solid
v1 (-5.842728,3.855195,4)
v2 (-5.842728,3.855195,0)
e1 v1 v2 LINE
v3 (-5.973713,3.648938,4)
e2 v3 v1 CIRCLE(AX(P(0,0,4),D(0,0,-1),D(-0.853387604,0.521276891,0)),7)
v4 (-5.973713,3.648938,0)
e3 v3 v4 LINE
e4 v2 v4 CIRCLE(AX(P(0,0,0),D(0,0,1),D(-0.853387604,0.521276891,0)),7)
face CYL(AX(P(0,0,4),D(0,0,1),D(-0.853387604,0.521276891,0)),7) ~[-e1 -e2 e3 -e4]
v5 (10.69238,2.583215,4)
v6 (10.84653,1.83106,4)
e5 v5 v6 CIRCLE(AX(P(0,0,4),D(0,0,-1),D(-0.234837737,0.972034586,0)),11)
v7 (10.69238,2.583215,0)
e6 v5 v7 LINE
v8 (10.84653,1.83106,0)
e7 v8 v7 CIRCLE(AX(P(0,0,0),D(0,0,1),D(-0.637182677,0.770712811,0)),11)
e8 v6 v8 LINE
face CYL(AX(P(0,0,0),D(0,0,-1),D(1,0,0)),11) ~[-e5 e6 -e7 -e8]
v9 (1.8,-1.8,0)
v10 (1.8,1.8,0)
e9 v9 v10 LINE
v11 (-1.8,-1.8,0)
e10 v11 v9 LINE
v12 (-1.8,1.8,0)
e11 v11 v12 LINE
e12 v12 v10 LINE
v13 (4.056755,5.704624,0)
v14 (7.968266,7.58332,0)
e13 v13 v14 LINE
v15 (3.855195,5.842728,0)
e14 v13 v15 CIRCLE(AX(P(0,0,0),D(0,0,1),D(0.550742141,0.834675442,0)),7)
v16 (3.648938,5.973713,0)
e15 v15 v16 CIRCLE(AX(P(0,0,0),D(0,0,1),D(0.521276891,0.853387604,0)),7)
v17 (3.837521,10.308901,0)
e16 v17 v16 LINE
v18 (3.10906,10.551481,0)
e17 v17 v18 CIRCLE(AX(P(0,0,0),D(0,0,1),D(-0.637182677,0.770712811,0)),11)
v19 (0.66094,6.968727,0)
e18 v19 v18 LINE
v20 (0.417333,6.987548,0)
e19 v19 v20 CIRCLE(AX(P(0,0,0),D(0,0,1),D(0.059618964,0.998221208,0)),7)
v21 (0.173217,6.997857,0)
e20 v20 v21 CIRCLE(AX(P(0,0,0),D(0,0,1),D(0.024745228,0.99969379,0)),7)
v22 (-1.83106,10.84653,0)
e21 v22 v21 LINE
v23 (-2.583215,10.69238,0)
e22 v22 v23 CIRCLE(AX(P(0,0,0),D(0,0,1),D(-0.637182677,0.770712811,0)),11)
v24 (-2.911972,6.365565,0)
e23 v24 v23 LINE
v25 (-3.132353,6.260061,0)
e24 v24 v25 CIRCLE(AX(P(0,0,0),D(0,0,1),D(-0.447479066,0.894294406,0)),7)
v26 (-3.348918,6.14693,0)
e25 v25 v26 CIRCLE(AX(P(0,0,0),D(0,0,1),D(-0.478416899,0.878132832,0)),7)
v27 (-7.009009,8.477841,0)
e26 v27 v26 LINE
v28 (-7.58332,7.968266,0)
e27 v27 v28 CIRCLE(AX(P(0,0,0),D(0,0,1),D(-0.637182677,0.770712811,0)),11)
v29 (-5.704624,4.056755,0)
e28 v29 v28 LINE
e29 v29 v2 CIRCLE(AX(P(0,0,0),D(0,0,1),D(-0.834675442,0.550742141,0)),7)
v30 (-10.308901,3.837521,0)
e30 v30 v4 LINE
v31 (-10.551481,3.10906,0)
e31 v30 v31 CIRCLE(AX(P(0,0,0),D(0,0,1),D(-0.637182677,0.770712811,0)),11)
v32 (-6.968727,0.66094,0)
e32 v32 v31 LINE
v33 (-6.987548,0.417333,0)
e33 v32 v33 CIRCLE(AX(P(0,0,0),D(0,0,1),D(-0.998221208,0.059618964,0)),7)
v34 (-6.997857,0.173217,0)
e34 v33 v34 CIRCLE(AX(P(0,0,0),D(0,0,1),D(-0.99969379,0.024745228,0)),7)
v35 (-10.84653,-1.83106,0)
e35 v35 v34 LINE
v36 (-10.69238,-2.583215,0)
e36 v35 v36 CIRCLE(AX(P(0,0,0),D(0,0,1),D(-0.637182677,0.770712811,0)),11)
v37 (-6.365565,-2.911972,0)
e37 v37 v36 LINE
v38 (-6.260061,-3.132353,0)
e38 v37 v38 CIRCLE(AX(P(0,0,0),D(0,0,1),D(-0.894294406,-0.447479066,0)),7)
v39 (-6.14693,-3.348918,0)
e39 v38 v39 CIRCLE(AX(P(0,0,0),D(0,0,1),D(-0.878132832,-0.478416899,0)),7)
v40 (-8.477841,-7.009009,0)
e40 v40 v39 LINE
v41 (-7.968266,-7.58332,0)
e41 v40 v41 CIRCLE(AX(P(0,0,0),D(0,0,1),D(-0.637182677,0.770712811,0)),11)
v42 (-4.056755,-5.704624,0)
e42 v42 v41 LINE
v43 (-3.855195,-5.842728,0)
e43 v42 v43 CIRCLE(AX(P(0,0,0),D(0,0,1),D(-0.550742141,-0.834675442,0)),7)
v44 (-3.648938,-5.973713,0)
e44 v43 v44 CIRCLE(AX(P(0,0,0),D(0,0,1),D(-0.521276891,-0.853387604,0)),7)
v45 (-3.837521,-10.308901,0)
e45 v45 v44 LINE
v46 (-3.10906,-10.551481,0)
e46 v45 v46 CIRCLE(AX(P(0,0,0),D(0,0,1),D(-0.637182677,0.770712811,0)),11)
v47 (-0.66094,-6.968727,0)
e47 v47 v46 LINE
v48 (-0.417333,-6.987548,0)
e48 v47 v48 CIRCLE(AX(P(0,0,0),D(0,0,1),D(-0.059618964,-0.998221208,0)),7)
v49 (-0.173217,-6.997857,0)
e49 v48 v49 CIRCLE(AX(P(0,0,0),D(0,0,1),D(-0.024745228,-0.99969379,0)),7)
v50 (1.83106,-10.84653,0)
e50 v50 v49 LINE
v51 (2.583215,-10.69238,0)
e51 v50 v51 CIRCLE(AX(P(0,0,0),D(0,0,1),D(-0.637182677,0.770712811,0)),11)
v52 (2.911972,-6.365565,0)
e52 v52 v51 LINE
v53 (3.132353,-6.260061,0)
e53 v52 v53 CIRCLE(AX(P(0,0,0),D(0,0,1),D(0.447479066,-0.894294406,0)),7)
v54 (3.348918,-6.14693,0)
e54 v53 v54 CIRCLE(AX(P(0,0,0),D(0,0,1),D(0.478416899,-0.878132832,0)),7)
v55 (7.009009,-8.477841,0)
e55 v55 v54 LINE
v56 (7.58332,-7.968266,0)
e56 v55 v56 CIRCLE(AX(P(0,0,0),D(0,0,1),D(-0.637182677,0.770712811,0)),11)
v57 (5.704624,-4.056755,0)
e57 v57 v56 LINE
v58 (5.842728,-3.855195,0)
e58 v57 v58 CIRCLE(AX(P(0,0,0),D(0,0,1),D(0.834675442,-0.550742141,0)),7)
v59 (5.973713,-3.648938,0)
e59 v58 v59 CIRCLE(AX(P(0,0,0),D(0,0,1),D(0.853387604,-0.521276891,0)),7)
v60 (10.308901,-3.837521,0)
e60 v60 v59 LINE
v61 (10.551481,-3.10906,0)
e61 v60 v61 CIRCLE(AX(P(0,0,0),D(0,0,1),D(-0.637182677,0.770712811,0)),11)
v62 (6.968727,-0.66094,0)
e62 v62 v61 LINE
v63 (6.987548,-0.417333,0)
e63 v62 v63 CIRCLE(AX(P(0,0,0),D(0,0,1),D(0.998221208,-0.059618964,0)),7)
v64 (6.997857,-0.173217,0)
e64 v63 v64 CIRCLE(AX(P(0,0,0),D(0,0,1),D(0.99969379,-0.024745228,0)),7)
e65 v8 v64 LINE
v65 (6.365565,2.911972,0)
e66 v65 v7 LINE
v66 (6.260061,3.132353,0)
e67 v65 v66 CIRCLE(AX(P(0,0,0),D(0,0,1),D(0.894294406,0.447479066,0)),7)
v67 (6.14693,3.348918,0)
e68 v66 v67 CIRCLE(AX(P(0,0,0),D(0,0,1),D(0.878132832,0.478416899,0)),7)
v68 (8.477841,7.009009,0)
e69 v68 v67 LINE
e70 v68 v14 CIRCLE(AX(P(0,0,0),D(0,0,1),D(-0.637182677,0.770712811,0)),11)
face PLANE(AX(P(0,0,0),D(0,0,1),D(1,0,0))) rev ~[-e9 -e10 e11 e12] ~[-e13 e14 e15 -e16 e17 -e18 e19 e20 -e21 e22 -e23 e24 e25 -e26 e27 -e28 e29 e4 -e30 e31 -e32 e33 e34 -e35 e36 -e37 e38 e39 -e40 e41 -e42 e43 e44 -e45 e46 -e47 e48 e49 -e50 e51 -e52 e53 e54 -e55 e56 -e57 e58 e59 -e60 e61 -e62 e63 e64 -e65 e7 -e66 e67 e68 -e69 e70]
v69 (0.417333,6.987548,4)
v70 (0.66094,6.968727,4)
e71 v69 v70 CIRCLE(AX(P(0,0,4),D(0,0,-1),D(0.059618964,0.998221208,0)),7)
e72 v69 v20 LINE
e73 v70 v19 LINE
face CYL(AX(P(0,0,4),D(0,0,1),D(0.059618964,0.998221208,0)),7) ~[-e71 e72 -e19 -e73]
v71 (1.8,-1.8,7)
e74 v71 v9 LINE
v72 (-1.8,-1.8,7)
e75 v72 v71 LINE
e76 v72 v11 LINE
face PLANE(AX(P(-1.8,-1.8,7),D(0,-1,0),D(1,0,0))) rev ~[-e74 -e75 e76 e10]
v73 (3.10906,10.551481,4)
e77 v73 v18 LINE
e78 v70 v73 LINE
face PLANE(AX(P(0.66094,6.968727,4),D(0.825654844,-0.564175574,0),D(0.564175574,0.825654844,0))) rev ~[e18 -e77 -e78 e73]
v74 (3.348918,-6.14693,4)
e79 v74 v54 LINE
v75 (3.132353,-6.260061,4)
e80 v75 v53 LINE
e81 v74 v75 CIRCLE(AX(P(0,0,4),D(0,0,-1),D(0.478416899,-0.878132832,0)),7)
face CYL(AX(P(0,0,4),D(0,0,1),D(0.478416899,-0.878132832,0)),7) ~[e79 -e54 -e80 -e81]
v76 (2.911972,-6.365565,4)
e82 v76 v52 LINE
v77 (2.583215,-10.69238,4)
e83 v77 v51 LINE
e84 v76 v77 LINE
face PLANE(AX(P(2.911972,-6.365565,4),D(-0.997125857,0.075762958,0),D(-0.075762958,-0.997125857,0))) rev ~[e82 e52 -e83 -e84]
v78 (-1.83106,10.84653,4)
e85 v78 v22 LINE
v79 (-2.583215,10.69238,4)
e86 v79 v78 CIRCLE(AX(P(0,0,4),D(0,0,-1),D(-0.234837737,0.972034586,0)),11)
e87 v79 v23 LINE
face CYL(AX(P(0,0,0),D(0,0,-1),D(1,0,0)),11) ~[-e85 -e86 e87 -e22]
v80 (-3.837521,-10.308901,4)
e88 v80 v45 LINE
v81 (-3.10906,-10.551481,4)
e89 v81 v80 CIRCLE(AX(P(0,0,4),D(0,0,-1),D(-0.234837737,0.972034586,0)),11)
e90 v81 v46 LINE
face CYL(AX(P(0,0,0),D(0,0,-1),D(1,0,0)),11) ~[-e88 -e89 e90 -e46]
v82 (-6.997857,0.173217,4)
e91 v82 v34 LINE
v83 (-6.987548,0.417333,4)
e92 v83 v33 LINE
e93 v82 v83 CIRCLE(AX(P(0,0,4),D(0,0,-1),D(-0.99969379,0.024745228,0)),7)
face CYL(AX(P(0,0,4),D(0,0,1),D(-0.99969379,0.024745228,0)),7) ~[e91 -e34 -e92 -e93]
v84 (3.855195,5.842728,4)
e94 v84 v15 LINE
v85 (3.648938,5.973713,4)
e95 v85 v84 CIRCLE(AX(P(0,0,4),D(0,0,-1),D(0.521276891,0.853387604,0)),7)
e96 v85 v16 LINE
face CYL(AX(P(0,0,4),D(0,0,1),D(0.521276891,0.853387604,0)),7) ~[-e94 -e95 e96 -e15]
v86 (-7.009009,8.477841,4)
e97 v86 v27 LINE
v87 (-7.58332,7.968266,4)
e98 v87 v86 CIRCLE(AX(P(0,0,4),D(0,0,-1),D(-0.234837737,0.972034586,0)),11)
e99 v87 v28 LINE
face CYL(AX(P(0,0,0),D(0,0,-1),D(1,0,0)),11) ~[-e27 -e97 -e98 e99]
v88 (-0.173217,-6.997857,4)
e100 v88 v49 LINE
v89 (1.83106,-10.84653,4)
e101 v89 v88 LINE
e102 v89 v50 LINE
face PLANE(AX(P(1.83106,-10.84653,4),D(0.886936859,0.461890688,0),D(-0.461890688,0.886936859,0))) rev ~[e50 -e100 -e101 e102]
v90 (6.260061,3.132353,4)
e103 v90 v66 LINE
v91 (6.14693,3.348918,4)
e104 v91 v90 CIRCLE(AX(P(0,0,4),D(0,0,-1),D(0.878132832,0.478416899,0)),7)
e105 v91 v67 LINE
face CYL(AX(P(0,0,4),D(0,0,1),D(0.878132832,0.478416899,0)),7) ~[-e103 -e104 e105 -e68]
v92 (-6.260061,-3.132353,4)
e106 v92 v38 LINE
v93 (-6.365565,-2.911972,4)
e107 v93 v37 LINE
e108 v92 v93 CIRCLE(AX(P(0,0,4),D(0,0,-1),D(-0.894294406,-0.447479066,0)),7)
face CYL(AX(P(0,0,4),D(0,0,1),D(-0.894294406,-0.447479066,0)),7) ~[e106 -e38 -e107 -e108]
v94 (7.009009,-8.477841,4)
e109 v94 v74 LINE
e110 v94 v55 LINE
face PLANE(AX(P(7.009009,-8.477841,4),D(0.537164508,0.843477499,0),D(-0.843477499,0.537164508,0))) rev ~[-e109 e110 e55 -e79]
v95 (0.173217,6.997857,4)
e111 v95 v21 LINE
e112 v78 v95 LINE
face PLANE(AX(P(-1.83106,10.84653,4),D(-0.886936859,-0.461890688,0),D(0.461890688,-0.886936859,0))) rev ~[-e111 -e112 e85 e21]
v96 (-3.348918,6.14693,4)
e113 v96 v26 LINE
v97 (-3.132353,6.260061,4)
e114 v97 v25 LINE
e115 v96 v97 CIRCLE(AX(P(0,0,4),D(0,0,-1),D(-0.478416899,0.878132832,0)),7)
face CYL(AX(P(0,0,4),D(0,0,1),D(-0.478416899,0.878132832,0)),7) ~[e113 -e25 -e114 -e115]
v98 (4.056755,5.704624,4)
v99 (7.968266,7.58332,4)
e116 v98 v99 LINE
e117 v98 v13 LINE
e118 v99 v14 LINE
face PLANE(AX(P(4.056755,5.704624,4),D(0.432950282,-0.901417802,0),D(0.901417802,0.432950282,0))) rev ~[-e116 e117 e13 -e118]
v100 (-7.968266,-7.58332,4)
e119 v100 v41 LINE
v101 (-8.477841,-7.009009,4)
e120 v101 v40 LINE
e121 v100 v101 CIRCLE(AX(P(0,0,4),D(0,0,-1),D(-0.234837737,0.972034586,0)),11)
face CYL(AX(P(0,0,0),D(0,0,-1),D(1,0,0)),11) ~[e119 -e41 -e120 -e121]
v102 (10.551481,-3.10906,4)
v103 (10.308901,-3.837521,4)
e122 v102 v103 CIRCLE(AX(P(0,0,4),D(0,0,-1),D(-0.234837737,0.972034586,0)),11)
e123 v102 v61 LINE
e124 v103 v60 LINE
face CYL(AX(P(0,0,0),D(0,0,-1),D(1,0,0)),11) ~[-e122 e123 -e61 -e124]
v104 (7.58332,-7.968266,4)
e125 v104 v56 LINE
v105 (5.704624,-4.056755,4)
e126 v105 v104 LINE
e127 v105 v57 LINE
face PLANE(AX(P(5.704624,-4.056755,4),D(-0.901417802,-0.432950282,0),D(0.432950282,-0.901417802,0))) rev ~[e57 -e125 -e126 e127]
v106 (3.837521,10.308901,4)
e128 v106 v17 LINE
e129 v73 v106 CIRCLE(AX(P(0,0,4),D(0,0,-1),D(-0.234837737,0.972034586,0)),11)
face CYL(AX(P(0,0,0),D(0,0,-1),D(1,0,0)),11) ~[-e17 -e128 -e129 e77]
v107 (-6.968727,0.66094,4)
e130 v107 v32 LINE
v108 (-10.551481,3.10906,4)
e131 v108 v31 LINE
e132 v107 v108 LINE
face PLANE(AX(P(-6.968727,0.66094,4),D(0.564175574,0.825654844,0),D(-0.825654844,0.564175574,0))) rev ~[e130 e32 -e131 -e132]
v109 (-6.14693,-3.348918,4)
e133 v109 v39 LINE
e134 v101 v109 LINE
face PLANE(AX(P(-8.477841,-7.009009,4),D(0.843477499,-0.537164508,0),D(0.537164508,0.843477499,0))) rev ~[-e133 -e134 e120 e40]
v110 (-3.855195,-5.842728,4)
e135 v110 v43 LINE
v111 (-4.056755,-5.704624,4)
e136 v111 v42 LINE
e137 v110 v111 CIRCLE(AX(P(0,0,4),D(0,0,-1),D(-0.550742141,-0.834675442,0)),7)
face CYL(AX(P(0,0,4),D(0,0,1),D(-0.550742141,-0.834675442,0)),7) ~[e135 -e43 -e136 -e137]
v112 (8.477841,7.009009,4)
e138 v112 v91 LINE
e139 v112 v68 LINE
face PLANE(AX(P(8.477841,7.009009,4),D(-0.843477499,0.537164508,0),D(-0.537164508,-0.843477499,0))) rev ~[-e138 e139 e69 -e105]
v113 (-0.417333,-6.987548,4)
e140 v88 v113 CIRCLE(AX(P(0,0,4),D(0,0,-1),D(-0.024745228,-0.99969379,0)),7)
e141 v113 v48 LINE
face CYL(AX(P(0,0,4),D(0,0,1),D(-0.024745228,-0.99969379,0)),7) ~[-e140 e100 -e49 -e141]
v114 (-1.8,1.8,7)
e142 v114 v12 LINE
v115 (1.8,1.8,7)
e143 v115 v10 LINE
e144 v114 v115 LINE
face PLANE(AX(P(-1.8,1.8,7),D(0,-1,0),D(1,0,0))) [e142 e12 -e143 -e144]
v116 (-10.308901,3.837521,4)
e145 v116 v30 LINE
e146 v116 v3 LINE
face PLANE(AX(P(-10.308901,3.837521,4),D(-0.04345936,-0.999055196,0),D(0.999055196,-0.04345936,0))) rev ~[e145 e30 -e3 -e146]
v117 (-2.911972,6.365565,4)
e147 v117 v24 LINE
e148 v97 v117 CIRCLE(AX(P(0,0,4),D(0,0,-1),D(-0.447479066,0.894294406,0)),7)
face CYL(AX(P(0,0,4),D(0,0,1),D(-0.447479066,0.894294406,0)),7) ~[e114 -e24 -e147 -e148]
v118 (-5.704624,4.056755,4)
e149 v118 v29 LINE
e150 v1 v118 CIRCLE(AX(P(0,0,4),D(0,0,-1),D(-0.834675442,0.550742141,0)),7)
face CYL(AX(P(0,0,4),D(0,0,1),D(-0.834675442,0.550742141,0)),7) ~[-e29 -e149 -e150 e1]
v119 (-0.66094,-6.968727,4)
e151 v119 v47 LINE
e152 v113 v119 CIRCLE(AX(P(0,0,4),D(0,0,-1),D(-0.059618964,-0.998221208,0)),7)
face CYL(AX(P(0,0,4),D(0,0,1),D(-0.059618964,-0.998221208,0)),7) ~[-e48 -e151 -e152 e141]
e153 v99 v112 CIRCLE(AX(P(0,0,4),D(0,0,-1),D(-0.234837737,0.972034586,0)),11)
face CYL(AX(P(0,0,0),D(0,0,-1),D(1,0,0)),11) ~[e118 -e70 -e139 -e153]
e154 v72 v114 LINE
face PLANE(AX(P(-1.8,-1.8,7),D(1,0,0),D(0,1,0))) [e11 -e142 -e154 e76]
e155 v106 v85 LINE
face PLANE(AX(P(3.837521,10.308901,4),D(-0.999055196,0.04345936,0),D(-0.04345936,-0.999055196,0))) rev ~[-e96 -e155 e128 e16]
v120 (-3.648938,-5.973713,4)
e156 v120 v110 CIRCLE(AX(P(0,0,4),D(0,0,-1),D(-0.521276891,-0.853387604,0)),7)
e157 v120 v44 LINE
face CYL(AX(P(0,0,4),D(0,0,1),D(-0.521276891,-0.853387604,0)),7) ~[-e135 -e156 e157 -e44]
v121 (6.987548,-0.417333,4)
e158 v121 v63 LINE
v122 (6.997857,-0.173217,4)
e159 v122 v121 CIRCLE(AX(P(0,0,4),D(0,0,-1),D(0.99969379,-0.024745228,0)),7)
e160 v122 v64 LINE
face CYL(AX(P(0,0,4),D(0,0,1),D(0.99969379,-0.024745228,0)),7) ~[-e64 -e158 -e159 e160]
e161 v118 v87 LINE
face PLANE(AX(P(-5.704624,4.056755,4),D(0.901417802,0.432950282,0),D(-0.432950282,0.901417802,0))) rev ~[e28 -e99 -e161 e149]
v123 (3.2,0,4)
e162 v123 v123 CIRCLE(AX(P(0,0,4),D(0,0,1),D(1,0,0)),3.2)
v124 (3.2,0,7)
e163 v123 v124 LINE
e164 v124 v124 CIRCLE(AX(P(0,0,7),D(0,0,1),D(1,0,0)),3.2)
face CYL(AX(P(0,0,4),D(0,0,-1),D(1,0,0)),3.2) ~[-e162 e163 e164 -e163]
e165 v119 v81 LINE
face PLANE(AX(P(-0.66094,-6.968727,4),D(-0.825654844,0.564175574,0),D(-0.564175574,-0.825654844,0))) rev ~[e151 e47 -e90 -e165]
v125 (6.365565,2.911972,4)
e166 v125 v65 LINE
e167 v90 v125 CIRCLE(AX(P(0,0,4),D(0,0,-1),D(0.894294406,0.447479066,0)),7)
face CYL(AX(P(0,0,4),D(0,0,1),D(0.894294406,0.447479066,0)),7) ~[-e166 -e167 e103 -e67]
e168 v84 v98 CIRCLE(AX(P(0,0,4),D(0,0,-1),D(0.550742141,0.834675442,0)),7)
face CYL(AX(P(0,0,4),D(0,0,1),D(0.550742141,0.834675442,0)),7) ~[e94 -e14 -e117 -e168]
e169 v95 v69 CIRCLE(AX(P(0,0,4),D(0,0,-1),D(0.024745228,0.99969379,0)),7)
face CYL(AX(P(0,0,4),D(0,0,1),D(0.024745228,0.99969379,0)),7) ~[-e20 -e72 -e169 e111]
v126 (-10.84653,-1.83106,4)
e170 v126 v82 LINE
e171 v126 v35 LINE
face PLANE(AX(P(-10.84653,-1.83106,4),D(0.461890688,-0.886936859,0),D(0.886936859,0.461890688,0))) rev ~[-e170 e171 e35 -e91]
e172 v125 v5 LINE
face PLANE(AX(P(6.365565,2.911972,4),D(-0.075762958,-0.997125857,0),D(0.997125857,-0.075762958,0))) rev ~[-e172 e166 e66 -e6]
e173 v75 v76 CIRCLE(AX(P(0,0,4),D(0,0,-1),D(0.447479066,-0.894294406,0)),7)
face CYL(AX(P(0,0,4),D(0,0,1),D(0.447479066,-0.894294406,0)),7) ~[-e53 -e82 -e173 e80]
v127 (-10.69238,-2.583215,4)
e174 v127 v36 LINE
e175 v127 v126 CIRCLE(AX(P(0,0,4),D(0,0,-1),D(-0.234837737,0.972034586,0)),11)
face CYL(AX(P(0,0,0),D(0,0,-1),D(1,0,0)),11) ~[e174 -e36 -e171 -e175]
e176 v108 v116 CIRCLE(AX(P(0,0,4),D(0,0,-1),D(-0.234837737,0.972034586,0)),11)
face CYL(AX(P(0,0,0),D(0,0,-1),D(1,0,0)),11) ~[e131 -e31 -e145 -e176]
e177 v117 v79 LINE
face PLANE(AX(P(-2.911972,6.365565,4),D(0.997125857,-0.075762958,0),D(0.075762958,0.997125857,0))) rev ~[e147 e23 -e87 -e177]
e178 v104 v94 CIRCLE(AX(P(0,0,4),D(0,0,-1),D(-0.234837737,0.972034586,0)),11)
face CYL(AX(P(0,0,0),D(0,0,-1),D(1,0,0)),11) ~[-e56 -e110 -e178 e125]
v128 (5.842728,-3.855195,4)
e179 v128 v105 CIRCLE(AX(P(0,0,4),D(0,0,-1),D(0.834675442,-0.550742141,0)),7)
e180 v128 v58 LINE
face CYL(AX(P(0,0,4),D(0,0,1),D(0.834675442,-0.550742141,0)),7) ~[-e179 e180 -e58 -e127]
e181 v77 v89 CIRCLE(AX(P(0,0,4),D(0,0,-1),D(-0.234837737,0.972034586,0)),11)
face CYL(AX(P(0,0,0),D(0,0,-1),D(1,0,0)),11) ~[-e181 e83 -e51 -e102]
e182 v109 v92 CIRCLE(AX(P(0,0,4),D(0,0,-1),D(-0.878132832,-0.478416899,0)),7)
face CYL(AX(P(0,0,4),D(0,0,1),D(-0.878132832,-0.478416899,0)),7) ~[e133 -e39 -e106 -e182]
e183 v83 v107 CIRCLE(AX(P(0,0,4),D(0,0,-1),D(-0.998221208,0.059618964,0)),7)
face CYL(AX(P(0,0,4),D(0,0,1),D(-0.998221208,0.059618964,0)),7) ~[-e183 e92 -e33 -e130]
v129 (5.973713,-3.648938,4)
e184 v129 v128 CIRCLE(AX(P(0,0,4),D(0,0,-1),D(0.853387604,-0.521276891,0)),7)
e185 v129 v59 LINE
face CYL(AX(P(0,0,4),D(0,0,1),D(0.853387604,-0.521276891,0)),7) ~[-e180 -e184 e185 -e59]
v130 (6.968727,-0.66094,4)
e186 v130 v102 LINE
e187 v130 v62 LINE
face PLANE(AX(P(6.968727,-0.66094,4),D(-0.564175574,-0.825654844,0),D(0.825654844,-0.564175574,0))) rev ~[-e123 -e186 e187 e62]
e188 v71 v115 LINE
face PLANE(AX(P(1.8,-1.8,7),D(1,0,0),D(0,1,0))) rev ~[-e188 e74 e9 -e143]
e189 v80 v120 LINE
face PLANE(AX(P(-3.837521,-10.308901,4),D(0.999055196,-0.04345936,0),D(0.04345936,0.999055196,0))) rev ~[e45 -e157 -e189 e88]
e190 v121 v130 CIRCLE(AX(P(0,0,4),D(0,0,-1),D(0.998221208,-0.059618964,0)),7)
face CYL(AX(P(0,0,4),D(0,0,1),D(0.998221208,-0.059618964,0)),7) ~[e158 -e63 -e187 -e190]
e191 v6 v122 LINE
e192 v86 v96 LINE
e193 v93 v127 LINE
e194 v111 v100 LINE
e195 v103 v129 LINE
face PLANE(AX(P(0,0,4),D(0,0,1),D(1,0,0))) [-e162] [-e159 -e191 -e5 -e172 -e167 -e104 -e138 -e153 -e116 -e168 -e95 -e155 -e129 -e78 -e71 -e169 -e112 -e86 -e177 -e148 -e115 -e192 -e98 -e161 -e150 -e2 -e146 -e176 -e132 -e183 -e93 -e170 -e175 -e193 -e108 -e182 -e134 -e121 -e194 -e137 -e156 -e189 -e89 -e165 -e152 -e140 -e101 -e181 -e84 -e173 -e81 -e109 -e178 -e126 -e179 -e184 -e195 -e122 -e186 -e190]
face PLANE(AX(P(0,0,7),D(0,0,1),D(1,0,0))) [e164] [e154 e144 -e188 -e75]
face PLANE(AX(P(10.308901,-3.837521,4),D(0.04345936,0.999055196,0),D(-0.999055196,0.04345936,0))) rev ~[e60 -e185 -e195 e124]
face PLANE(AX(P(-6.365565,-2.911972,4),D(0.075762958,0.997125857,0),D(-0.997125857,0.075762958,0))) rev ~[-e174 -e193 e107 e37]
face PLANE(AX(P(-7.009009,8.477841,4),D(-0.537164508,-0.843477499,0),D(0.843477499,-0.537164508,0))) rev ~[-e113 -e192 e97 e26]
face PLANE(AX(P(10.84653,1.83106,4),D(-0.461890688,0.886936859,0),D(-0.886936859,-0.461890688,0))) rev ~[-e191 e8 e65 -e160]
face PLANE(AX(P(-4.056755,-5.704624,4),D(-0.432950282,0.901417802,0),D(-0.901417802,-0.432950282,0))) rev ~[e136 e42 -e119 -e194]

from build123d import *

# Parameters (mm, degrees)
F0_R            = 11
F1_DEPTH        = 4
F3_DEPTH        = 4.001
F3_COPIES_COUNT = 12
F5_R            = 3.2
F6_DEPTH        = 3
F7_W            = 3.6
F7_H            = 3.6
F8_DEPTH        = 7.001


# Not quite as in the source:
# - a pattern or mirror of a feature is missing from the dataset's text; its kind, count and spacing are read off the source's solid


with BuildPart() as f1:
    # F0 (on Top) → F1 (new body)
    with BuildSketch(Plane.XY):
        Circle(F0_R)
    extrude(amount=F1_DEPTH)

    # F2 (on face) → F3 (cut, through all)
    with BuildSketch(Plane.XY.offset(4)):
        with BuildLine():
            ThreePointArc((-3.3489182935, 6.1469298242), (-3.2411295194, 6.2044403002), (-3.1323534658, 6.2600608436))
            Line((-3.1323534658, 6.2600608436), (-4.922269732, 9.8372384685))
            ThreePointArc((-4.922269732, 9.8372384685), (-6.004235681, 9.2167865272), (-7.0090094429, 8.4778409179))
            Line((-7.0090094429, 8.4778409179), (-3.3489182935, 6.1469298242))
        make_face()
        with BuildLine():
            Line((-4.922269732, 9.8372384685), (-3.1323534658, 6.2600608436))
            ThreePointArc((-3.1323534658, 6.2600608436), (-3.022623267, 6.3137745118), (-2.9119723479, 6.3655649431))
            Line((-2.9119723479, 6.3655649431), (-2.5832151123, 10.6923804498))
            ThreePointArc((-2.5832151123, 10.6923804498), (-3.7770216625, 10.3312200326), (-4.922269732, 9.8372384685))
        make_face()
    f3 = extrude(amount=-F3_DEPTH, mode=Mode.SUBTRACT)

    # F3_copies: F3 ×12 about axis
    f3_copies_axis = Axis((0, 0, 0), (0, 0, 1))
    for i in range(1, F3_COPIES_COUNT):
        add(f3.rotate(f3_copies_axis, i * 360 / F3_COPIES_COUNT), mode=Mode.SUBTRACT)

    # F5 (on face) → F6 (join)
    with BuildSketch(Plane.XY.offset(4)):
        Circle(F5_R)
    extrude(amount=F6_DEPTH)

    # F7 (on face) → F8 (cut, through all)
    with BuildSketch(Plane.XY.offset(7)):
        Rectangle(F7_W, F7_H)
    extrude(amount=-F8_DEPTH, mode=Mode.SUBTRACT)


solid = f1.part
